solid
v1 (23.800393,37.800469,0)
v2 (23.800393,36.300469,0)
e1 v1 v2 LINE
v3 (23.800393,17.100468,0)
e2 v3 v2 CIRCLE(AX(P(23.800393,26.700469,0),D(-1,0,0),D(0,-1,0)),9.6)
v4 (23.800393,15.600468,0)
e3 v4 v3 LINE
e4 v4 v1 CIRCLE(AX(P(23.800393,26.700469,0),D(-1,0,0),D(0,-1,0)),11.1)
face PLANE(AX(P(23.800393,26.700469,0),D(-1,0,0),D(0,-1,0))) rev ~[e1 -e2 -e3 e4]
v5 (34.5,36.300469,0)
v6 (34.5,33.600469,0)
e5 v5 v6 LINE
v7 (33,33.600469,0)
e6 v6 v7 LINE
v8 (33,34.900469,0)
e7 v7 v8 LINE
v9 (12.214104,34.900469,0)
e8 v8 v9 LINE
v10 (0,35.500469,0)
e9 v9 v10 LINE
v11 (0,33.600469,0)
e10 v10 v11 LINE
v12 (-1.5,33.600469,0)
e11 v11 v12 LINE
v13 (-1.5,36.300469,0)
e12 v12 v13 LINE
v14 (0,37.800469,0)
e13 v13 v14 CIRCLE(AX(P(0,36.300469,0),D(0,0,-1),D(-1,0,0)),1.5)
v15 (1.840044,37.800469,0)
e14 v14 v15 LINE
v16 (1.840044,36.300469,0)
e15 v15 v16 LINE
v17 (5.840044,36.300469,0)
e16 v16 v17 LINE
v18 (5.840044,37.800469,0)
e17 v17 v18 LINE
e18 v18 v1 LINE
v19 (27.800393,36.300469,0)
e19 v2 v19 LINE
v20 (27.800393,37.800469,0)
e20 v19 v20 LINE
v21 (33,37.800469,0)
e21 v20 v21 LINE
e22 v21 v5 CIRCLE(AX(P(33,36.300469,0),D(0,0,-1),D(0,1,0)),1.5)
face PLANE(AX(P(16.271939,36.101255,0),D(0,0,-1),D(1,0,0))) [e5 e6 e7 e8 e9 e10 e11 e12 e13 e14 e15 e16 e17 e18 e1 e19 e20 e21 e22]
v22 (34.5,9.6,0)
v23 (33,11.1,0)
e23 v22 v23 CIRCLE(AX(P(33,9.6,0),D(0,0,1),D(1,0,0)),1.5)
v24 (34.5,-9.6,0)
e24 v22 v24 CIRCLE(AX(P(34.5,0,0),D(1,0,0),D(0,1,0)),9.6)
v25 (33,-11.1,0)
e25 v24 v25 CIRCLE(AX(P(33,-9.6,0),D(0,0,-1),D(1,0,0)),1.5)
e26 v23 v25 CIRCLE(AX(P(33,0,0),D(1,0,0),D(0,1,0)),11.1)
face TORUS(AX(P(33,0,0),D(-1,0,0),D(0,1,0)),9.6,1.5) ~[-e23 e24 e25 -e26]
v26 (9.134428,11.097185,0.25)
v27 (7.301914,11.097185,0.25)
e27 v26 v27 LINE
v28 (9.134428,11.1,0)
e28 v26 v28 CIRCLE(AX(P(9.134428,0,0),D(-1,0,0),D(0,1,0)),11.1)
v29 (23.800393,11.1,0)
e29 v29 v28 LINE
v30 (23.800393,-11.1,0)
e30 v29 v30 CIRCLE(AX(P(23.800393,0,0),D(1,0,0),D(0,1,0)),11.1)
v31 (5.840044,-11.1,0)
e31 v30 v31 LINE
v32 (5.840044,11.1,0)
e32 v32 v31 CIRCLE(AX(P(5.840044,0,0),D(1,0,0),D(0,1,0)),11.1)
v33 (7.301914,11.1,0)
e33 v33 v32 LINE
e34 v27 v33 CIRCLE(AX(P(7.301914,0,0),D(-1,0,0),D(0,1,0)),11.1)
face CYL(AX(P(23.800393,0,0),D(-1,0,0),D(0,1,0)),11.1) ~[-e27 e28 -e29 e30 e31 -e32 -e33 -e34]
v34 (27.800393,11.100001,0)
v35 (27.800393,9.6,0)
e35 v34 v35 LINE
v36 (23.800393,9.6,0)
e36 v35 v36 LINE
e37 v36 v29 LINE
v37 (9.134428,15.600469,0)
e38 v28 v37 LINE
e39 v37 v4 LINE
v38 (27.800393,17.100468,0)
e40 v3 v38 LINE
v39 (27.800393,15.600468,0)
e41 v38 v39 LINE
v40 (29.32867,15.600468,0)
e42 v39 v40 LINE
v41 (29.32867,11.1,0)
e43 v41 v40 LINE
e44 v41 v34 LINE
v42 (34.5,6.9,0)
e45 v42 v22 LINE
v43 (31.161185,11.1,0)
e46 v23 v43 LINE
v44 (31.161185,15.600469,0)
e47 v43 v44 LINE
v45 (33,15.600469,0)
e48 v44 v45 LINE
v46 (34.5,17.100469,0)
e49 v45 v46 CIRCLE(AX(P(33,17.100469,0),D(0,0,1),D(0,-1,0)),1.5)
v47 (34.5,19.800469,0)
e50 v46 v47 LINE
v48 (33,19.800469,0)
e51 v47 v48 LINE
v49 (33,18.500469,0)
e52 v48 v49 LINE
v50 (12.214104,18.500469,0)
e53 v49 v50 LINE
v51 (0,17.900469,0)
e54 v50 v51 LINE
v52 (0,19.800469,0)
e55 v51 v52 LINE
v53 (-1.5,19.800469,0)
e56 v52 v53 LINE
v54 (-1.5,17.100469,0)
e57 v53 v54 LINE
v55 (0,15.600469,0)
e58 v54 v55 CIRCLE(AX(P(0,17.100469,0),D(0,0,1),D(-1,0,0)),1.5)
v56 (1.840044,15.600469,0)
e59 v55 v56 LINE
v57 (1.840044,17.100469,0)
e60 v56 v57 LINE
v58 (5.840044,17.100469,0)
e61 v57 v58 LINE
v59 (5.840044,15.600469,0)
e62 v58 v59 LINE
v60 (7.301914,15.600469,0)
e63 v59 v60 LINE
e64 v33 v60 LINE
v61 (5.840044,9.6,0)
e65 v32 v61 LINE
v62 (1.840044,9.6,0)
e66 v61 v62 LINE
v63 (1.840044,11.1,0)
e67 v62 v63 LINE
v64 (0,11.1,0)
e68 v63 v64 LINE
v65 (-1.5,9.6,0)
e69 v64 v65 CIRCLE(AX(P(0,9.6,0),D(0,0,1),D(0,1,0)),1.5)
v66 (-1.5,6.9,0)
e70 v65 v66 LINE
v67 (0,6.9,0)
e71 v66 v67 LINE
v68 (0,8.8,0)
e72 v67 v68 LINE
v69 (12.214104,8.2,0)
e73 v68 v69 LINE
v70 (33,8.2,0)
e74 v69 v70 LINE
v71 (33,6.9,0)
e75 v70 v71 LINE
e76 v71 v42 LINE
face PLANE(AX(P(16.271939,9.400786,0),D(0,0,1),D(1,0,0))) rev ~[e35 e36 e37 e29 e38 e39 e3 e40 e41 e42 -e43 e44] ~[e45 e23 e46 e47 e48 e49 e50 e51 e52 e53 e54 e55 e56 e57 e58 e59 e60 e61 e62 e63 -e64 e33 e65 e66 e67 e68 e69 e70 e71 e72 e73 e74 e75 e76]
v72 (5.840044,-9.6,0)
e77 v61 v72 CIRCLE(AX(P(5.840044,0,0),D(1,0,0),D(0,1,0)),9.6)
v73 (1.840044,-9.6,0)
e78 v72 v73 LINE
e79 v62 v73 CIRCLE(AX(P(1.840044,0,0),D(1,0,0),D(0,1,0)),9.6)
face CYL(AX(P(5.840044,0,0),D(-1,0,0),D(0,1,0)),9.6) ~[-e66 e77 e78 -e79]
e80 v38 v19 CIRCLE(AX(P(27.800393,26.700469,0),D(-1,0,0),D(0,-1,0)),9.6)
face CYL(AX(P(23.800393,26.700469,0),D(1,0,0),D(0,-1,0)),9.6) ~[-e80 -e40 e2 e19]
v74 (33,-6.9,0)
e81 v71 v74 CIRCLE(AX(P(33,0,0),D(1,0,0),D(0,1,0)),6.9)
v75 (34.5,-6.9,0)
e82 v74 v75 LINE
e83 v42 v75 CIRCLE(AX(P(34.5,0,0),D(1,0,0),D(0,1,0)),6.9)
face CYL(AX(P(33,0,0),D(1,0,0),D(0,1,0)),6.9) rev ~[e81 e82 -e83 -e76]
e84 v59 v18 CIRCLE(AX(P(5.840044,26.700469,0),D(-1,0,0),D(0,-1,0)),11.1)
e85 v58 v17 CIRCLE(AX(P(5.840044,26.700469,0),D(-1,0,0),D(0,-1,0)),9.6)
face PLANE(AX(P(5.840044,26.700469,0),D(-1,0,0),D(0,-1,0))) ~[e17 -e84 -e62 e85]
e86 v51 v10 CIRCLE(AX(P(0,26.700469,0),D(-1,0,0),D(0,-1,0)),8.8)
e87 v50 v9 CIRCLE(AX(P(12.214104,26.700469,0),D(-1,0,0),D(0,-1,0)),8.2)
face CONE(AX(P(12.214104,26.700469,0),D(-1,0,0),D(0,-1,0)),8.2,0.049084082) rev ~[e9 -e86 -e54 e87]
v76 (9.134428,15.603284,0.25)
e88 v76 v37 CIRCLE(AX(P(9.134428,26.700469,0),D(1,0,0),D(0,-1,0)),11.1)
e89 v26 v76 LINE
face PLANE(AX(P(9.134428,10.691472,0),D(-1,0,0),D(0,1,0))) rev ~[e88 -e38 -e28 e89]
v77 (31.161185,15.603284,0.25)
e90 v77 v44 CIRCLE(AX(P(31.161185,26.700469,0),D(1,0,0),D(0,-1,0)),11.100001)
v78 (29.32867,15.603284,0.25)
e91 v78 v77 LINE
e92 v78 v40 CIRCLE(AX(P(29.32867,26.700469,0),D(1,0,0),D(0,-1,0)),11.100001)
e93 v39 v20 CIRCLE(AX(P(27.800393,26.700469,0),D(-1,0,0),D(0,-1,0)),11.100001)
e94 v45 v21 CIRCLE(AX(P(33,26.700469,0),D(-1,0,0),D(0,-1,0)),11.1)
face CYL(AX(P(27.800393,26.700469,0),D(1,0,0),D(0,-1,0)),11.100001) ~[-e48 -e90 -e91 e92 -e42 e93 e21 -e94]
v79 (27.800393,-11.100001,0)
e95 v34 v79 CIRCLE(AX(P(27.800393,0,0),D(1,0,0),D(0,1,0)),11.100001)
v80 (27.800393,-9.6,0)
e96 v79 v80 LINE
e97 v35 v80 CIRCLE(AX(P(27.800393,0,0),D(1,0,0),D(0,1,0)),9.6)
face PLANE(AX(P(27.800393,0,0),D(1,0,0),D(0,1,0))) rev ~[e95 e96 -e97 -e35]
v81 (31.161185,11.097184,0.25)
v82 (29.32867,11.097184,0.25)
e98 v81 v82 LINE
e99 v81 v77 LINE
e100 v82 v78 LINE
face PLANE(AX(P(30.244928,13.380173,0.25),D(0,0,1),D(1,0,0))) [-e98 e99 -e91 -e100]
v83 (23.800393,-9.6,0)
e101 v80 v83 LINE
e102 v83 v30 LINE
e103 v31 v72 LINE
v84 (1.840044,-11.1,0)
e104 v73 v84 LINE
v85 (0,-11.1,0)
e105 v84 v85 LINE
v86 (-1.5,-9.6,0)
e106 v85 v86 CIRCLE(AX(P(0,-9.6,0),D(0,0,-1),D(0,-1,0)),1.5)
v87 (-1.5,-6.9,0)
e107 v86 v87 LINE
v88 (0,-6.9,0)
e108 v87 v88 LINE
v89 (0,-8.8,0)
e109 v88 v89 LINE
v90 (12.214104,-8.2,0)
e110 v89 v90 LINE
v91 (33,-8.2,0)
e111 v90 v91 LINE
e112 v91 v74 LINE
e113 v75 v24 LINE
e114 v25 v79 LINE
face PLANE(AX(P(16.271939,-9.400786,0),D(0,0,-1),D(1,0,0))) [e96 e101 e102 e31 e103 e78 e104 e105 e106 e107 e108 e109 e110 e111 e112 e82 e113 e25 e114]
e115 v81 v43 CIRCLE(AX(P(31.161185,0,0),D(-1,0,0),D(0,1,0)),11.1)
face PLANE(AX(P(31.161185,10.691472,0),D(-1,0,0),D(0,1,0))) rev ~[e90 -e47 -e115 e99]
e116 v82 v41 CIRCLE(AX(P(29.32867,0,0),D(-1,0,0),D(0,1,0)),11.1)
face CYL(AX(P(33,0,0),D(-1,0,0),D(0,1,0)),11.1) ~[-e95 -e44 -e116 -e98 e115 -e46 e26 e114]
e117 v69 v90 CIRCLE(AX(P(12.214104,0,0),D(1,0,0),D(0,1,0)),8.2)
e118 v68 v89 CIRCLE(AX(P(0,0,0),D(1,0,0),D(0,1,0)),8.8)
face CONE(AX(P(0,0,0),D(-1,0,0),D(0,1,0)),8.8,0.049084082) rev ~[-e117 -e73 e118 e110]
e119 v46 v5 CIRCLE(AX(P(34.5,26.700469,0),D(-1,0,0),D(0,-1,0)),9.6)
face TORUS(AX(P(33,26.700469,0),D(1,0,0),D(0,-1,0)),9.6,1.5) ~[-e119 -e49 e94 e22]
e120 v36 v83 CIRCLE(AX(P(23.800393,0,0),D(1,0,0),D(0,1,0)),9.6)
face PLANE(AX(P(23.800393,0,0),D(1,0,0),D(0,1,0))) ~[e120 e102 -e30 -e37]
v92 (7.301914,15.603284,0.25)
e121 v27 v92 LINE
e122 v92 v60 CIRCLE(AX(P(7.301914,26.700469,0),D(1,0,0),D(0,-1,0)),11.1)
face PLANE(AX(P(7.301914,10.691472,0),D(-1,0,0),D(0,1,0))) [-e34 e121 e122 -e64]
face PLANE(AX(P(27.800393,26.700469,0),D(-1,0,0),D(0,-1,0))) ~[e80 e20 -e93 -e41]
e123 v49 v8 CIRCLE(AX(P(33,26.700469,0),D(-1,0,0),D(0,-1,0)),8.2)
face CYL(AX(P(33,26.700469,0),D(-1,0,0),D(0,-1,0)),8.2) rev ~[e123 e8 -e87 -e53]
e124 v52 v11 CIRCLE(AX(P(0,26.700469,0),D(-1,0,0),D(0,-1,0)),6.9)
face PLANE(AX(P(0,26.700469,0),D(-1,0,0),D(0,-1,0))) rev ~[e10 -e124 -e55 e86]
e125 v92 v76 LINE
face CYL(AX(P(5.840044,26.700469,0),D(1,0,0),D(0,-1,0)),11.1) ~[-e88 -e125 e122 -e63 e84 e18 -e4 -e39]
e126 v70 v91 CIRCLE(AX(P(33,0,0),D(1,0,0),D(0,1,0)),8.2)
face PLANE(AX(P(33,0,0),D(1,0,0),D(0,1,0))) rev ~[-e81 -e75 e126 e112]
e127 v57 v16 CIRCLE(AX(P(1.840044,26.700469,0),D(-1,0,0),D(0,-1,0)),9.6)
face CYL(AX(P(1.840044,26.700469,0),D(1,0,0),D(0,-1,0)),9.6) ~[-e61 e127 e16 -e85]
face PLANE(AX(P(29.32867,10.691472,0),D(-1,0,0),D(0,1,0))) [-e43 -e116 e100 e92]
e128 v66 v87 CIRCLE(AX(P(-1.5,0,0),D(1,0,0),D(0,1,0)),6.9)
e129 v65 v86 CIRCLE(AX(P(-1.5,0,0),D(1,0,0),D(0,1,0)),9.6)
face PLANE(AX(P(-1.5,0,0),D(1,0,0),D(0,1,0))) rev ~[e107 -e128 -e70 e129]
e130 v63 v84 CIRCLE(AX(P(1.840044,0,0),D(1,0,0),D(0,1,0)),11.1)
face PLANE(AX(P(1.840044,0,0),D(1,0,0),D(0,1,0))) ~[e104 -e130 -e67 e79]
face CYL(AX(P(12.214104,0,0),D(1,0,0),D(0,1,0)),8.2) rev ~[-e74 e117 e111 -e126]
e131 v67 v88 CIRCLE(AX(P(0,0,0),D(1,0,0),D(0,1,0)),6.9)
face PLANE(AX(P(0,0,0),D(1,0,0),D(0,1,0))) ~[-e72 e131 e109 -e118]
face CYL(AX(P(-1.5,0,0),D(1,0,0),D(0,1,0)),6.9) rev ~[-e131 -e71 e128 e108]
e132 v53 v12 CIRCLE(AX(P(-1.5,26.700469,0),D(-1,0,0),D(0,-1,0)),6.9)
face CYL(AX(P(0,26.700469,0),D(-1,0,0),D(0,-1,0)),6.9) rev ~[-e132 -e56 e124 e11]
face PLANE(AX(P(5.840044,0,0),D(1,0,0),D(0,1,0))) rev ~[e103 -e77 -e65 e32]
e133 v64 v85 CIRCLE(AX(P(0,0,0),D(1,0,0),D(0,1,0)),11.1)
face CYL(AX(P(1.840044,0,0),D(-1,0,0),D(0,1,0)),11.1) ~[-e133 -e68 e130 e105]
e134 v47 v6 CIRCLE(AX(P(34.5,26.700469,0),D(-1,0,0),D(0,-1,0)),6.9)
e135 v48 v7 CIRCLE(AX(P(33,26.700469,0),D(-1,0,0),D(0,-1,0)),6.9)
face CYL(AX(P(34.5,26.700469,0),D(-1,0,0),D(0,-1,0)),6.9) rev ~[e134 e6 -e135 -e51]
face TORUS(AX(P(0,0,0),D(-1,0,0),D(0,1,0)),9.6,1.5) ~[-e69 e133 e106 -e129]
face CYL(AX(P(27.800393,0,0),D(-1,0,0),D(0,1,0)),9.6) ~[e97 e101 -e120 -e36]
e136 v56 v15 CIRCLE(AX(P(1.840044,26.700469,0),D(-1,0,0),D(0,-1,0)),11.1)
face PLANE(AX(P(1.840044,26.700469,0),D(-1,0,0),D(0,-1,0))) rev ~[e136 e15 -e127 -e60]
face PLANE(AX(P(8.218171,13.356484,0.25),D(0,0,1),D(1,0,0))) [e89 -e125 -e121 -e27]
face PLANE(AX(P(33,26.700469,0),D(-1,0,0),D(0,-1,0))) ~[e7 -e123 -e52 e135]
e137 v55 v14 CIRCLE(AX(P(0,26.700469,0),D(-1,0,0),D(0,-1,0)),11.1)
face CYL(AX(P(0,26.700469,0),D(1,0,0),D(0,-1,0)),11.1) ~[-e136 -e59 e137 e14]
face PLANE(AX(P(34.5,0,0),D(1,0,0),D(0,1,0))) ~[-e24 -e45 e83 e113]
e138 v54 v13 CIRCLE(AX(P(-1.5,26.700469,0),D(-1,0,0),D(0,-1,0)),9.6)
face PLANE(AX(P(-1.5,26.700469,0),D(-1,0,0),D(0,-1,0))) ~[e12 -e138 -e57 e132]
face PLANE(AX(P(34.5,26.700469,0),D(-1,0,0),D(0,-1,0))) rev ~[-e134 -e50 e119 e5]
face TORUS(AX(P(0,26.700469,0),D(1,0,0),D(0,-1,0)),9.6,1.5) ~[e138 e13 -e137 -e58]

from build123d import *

# Parameters (mm, degrees)
F2_ANGLE = 180
F3_ANGLE = 180
F1_W     = 1.8325150013
F1_H     = 5.3774006665
F1_W_2   = 1.83251407
F1_H_2   = 5.3300224245
F4_DEPTH = 0.25


# Not quite as in the source:
# - ends of sketch curves that miss each other by under 0.0002 mm in the source are joined
# - a feature names something its author has since deleted; it is built from what else it names


with BuildPart() as f2:
    # F0 (on Top) → F2 (revolve)
    with BuildSketch(Plane.XY):
        with BuildLine():
            Line((34.5, 8.2), (34.5, 9.6))
            ThreePointArc((34.5, 9.6), (34.0606601718, 10.6606601718), (33, 11.1))
            Line((33, 11.1), (27.8003929108, 11.1000006409))
            Line((27.8003929108, 11.1000006409), (27.8003929108, 9.600000456))
            Line((27.8003929108, 9.600000456), (23.8003929108, 9.600000456))
            Line((23.8003929108, 9.600000456), (23.8003929108, 11.100000456))
            Line((23.8003929108, 11.100000456), (5.8400444046, 11.0999997705))
            Line((5.8400444046, 11.0999997705), (5.8400444046, 9.6))
            Line((5.8400444046, 9.6), (1.8400444046, 9.6))
            Line((1.8400444046, 9.6), (1.8400444046, 11.1))
            Line((1.8400444046, 11.1), (0, 11.1))
            ThreePointArc((0, 11.1), (-1.0606601718, 10.6606601718), (-1.5, 9.6))
            Line((-1.5, 9.6), (-1.5, 6.9))
            Line((-1.5, 6.9), (0, 6.9))
            Line((0, 6.9), (0, 8.8))
            Line((0, 8.8), (12.2141037136, 8.2))
            Line((12.2141037136, 8.2), (33, 8.2))
            Line((33, 8.2), (33, 6.9))
            Line((33, 6.9), (34.5, 6.9))
            Line((34.5, 6.9), (34.5, 8.2))
        make_face()
    revolve(axis=Axis((17.25, 0, 0), (1, 0, 0)), revolution_arc=F2_ANGLE)



with BuildPart() as f3:
    # F0 (on Top) → F3 (revolve)
    with BuildSketch(Plane.XY):
        with BuildLine():
            Line((34.5, 17.1004687339), (34.5, 18.5004687339))
            Line((34.5, 18.5004687339), (34.5, 19.8004687339))
            Line((34.5, 19.8004687339), (33, 19.8004687339))
            Line((33, 19.8004687339), (33, 18.5004687339))
            Line((33, 18.5004687339), (12.2141037136, 18.5004687339))
            Line((12.2141037136, 18.5004687339), (0, 17.9004687339))
            Line((0, 17.9004687339), (0, 19.8004687339))
            Line((0, 19.8004687339), (-1.5, 19.8004687339))
            Line((-1.5, 19.8004687339), (-1.5, 17.1004687339))
            ThreePointArc((-1.5, 17.1004687339), (-1.0606601718, 16.0398085621), (0, 15.6004687339))
            Line((0, 15.6004687339), (1.8400444046, 15.6004687339))
            Line((1.8400444046, 15.6004687339), (1.8400444046, 17.1004687339))
            Line((1.8400444046, 17.1004687339), (5.8400444046, 17.1004687339))
            Line((5.8400444046, 17.1004687339), (5.8400444046, 15.6004687339))
            Line((5.8400444046, 15.6004687339), (23.8003929108, 15.6004682779))
            Line((23.8003929108, 15.6004682779), (23.8003929108, 17.1004682779))
            Line((23.8003929108, 17.1004682779), (27.8003929108, 17.1004682779))
            Line((27.8003929108, 17.1004682779), (27.8003929108, 15.6004680931))
            Line((27.8003929108, 15.6004680931), (33, 15.6004687339))
            ThreePointArc((33, 15.6004687339), (34.0606601718, 16.0398085621), (34.5, 17.1004687339))
        make_face()
    revolve(axis=Axis((17.25, 26.7004687339, 0), (-1, 0, 0)), revolution_arc=F3_ANGLE)


with BuildPart() as f2_1:
    add(f2.part)

    add(f3.part)  # F4 merges F3
    # F1 (on Top) → F4 (join)
    with BuildSketch(Plane.XY):
        with Locations((30.2449278533, 13.3801726624)):
            Rectangle(F1_W, F1_H)
        with Locations((8.218171075, 13.3564835414)):
            Rectangle(F1_W_2, F1_H_2)
    extrude(amount=F4_DEPTH)


solid = f2_1.part
